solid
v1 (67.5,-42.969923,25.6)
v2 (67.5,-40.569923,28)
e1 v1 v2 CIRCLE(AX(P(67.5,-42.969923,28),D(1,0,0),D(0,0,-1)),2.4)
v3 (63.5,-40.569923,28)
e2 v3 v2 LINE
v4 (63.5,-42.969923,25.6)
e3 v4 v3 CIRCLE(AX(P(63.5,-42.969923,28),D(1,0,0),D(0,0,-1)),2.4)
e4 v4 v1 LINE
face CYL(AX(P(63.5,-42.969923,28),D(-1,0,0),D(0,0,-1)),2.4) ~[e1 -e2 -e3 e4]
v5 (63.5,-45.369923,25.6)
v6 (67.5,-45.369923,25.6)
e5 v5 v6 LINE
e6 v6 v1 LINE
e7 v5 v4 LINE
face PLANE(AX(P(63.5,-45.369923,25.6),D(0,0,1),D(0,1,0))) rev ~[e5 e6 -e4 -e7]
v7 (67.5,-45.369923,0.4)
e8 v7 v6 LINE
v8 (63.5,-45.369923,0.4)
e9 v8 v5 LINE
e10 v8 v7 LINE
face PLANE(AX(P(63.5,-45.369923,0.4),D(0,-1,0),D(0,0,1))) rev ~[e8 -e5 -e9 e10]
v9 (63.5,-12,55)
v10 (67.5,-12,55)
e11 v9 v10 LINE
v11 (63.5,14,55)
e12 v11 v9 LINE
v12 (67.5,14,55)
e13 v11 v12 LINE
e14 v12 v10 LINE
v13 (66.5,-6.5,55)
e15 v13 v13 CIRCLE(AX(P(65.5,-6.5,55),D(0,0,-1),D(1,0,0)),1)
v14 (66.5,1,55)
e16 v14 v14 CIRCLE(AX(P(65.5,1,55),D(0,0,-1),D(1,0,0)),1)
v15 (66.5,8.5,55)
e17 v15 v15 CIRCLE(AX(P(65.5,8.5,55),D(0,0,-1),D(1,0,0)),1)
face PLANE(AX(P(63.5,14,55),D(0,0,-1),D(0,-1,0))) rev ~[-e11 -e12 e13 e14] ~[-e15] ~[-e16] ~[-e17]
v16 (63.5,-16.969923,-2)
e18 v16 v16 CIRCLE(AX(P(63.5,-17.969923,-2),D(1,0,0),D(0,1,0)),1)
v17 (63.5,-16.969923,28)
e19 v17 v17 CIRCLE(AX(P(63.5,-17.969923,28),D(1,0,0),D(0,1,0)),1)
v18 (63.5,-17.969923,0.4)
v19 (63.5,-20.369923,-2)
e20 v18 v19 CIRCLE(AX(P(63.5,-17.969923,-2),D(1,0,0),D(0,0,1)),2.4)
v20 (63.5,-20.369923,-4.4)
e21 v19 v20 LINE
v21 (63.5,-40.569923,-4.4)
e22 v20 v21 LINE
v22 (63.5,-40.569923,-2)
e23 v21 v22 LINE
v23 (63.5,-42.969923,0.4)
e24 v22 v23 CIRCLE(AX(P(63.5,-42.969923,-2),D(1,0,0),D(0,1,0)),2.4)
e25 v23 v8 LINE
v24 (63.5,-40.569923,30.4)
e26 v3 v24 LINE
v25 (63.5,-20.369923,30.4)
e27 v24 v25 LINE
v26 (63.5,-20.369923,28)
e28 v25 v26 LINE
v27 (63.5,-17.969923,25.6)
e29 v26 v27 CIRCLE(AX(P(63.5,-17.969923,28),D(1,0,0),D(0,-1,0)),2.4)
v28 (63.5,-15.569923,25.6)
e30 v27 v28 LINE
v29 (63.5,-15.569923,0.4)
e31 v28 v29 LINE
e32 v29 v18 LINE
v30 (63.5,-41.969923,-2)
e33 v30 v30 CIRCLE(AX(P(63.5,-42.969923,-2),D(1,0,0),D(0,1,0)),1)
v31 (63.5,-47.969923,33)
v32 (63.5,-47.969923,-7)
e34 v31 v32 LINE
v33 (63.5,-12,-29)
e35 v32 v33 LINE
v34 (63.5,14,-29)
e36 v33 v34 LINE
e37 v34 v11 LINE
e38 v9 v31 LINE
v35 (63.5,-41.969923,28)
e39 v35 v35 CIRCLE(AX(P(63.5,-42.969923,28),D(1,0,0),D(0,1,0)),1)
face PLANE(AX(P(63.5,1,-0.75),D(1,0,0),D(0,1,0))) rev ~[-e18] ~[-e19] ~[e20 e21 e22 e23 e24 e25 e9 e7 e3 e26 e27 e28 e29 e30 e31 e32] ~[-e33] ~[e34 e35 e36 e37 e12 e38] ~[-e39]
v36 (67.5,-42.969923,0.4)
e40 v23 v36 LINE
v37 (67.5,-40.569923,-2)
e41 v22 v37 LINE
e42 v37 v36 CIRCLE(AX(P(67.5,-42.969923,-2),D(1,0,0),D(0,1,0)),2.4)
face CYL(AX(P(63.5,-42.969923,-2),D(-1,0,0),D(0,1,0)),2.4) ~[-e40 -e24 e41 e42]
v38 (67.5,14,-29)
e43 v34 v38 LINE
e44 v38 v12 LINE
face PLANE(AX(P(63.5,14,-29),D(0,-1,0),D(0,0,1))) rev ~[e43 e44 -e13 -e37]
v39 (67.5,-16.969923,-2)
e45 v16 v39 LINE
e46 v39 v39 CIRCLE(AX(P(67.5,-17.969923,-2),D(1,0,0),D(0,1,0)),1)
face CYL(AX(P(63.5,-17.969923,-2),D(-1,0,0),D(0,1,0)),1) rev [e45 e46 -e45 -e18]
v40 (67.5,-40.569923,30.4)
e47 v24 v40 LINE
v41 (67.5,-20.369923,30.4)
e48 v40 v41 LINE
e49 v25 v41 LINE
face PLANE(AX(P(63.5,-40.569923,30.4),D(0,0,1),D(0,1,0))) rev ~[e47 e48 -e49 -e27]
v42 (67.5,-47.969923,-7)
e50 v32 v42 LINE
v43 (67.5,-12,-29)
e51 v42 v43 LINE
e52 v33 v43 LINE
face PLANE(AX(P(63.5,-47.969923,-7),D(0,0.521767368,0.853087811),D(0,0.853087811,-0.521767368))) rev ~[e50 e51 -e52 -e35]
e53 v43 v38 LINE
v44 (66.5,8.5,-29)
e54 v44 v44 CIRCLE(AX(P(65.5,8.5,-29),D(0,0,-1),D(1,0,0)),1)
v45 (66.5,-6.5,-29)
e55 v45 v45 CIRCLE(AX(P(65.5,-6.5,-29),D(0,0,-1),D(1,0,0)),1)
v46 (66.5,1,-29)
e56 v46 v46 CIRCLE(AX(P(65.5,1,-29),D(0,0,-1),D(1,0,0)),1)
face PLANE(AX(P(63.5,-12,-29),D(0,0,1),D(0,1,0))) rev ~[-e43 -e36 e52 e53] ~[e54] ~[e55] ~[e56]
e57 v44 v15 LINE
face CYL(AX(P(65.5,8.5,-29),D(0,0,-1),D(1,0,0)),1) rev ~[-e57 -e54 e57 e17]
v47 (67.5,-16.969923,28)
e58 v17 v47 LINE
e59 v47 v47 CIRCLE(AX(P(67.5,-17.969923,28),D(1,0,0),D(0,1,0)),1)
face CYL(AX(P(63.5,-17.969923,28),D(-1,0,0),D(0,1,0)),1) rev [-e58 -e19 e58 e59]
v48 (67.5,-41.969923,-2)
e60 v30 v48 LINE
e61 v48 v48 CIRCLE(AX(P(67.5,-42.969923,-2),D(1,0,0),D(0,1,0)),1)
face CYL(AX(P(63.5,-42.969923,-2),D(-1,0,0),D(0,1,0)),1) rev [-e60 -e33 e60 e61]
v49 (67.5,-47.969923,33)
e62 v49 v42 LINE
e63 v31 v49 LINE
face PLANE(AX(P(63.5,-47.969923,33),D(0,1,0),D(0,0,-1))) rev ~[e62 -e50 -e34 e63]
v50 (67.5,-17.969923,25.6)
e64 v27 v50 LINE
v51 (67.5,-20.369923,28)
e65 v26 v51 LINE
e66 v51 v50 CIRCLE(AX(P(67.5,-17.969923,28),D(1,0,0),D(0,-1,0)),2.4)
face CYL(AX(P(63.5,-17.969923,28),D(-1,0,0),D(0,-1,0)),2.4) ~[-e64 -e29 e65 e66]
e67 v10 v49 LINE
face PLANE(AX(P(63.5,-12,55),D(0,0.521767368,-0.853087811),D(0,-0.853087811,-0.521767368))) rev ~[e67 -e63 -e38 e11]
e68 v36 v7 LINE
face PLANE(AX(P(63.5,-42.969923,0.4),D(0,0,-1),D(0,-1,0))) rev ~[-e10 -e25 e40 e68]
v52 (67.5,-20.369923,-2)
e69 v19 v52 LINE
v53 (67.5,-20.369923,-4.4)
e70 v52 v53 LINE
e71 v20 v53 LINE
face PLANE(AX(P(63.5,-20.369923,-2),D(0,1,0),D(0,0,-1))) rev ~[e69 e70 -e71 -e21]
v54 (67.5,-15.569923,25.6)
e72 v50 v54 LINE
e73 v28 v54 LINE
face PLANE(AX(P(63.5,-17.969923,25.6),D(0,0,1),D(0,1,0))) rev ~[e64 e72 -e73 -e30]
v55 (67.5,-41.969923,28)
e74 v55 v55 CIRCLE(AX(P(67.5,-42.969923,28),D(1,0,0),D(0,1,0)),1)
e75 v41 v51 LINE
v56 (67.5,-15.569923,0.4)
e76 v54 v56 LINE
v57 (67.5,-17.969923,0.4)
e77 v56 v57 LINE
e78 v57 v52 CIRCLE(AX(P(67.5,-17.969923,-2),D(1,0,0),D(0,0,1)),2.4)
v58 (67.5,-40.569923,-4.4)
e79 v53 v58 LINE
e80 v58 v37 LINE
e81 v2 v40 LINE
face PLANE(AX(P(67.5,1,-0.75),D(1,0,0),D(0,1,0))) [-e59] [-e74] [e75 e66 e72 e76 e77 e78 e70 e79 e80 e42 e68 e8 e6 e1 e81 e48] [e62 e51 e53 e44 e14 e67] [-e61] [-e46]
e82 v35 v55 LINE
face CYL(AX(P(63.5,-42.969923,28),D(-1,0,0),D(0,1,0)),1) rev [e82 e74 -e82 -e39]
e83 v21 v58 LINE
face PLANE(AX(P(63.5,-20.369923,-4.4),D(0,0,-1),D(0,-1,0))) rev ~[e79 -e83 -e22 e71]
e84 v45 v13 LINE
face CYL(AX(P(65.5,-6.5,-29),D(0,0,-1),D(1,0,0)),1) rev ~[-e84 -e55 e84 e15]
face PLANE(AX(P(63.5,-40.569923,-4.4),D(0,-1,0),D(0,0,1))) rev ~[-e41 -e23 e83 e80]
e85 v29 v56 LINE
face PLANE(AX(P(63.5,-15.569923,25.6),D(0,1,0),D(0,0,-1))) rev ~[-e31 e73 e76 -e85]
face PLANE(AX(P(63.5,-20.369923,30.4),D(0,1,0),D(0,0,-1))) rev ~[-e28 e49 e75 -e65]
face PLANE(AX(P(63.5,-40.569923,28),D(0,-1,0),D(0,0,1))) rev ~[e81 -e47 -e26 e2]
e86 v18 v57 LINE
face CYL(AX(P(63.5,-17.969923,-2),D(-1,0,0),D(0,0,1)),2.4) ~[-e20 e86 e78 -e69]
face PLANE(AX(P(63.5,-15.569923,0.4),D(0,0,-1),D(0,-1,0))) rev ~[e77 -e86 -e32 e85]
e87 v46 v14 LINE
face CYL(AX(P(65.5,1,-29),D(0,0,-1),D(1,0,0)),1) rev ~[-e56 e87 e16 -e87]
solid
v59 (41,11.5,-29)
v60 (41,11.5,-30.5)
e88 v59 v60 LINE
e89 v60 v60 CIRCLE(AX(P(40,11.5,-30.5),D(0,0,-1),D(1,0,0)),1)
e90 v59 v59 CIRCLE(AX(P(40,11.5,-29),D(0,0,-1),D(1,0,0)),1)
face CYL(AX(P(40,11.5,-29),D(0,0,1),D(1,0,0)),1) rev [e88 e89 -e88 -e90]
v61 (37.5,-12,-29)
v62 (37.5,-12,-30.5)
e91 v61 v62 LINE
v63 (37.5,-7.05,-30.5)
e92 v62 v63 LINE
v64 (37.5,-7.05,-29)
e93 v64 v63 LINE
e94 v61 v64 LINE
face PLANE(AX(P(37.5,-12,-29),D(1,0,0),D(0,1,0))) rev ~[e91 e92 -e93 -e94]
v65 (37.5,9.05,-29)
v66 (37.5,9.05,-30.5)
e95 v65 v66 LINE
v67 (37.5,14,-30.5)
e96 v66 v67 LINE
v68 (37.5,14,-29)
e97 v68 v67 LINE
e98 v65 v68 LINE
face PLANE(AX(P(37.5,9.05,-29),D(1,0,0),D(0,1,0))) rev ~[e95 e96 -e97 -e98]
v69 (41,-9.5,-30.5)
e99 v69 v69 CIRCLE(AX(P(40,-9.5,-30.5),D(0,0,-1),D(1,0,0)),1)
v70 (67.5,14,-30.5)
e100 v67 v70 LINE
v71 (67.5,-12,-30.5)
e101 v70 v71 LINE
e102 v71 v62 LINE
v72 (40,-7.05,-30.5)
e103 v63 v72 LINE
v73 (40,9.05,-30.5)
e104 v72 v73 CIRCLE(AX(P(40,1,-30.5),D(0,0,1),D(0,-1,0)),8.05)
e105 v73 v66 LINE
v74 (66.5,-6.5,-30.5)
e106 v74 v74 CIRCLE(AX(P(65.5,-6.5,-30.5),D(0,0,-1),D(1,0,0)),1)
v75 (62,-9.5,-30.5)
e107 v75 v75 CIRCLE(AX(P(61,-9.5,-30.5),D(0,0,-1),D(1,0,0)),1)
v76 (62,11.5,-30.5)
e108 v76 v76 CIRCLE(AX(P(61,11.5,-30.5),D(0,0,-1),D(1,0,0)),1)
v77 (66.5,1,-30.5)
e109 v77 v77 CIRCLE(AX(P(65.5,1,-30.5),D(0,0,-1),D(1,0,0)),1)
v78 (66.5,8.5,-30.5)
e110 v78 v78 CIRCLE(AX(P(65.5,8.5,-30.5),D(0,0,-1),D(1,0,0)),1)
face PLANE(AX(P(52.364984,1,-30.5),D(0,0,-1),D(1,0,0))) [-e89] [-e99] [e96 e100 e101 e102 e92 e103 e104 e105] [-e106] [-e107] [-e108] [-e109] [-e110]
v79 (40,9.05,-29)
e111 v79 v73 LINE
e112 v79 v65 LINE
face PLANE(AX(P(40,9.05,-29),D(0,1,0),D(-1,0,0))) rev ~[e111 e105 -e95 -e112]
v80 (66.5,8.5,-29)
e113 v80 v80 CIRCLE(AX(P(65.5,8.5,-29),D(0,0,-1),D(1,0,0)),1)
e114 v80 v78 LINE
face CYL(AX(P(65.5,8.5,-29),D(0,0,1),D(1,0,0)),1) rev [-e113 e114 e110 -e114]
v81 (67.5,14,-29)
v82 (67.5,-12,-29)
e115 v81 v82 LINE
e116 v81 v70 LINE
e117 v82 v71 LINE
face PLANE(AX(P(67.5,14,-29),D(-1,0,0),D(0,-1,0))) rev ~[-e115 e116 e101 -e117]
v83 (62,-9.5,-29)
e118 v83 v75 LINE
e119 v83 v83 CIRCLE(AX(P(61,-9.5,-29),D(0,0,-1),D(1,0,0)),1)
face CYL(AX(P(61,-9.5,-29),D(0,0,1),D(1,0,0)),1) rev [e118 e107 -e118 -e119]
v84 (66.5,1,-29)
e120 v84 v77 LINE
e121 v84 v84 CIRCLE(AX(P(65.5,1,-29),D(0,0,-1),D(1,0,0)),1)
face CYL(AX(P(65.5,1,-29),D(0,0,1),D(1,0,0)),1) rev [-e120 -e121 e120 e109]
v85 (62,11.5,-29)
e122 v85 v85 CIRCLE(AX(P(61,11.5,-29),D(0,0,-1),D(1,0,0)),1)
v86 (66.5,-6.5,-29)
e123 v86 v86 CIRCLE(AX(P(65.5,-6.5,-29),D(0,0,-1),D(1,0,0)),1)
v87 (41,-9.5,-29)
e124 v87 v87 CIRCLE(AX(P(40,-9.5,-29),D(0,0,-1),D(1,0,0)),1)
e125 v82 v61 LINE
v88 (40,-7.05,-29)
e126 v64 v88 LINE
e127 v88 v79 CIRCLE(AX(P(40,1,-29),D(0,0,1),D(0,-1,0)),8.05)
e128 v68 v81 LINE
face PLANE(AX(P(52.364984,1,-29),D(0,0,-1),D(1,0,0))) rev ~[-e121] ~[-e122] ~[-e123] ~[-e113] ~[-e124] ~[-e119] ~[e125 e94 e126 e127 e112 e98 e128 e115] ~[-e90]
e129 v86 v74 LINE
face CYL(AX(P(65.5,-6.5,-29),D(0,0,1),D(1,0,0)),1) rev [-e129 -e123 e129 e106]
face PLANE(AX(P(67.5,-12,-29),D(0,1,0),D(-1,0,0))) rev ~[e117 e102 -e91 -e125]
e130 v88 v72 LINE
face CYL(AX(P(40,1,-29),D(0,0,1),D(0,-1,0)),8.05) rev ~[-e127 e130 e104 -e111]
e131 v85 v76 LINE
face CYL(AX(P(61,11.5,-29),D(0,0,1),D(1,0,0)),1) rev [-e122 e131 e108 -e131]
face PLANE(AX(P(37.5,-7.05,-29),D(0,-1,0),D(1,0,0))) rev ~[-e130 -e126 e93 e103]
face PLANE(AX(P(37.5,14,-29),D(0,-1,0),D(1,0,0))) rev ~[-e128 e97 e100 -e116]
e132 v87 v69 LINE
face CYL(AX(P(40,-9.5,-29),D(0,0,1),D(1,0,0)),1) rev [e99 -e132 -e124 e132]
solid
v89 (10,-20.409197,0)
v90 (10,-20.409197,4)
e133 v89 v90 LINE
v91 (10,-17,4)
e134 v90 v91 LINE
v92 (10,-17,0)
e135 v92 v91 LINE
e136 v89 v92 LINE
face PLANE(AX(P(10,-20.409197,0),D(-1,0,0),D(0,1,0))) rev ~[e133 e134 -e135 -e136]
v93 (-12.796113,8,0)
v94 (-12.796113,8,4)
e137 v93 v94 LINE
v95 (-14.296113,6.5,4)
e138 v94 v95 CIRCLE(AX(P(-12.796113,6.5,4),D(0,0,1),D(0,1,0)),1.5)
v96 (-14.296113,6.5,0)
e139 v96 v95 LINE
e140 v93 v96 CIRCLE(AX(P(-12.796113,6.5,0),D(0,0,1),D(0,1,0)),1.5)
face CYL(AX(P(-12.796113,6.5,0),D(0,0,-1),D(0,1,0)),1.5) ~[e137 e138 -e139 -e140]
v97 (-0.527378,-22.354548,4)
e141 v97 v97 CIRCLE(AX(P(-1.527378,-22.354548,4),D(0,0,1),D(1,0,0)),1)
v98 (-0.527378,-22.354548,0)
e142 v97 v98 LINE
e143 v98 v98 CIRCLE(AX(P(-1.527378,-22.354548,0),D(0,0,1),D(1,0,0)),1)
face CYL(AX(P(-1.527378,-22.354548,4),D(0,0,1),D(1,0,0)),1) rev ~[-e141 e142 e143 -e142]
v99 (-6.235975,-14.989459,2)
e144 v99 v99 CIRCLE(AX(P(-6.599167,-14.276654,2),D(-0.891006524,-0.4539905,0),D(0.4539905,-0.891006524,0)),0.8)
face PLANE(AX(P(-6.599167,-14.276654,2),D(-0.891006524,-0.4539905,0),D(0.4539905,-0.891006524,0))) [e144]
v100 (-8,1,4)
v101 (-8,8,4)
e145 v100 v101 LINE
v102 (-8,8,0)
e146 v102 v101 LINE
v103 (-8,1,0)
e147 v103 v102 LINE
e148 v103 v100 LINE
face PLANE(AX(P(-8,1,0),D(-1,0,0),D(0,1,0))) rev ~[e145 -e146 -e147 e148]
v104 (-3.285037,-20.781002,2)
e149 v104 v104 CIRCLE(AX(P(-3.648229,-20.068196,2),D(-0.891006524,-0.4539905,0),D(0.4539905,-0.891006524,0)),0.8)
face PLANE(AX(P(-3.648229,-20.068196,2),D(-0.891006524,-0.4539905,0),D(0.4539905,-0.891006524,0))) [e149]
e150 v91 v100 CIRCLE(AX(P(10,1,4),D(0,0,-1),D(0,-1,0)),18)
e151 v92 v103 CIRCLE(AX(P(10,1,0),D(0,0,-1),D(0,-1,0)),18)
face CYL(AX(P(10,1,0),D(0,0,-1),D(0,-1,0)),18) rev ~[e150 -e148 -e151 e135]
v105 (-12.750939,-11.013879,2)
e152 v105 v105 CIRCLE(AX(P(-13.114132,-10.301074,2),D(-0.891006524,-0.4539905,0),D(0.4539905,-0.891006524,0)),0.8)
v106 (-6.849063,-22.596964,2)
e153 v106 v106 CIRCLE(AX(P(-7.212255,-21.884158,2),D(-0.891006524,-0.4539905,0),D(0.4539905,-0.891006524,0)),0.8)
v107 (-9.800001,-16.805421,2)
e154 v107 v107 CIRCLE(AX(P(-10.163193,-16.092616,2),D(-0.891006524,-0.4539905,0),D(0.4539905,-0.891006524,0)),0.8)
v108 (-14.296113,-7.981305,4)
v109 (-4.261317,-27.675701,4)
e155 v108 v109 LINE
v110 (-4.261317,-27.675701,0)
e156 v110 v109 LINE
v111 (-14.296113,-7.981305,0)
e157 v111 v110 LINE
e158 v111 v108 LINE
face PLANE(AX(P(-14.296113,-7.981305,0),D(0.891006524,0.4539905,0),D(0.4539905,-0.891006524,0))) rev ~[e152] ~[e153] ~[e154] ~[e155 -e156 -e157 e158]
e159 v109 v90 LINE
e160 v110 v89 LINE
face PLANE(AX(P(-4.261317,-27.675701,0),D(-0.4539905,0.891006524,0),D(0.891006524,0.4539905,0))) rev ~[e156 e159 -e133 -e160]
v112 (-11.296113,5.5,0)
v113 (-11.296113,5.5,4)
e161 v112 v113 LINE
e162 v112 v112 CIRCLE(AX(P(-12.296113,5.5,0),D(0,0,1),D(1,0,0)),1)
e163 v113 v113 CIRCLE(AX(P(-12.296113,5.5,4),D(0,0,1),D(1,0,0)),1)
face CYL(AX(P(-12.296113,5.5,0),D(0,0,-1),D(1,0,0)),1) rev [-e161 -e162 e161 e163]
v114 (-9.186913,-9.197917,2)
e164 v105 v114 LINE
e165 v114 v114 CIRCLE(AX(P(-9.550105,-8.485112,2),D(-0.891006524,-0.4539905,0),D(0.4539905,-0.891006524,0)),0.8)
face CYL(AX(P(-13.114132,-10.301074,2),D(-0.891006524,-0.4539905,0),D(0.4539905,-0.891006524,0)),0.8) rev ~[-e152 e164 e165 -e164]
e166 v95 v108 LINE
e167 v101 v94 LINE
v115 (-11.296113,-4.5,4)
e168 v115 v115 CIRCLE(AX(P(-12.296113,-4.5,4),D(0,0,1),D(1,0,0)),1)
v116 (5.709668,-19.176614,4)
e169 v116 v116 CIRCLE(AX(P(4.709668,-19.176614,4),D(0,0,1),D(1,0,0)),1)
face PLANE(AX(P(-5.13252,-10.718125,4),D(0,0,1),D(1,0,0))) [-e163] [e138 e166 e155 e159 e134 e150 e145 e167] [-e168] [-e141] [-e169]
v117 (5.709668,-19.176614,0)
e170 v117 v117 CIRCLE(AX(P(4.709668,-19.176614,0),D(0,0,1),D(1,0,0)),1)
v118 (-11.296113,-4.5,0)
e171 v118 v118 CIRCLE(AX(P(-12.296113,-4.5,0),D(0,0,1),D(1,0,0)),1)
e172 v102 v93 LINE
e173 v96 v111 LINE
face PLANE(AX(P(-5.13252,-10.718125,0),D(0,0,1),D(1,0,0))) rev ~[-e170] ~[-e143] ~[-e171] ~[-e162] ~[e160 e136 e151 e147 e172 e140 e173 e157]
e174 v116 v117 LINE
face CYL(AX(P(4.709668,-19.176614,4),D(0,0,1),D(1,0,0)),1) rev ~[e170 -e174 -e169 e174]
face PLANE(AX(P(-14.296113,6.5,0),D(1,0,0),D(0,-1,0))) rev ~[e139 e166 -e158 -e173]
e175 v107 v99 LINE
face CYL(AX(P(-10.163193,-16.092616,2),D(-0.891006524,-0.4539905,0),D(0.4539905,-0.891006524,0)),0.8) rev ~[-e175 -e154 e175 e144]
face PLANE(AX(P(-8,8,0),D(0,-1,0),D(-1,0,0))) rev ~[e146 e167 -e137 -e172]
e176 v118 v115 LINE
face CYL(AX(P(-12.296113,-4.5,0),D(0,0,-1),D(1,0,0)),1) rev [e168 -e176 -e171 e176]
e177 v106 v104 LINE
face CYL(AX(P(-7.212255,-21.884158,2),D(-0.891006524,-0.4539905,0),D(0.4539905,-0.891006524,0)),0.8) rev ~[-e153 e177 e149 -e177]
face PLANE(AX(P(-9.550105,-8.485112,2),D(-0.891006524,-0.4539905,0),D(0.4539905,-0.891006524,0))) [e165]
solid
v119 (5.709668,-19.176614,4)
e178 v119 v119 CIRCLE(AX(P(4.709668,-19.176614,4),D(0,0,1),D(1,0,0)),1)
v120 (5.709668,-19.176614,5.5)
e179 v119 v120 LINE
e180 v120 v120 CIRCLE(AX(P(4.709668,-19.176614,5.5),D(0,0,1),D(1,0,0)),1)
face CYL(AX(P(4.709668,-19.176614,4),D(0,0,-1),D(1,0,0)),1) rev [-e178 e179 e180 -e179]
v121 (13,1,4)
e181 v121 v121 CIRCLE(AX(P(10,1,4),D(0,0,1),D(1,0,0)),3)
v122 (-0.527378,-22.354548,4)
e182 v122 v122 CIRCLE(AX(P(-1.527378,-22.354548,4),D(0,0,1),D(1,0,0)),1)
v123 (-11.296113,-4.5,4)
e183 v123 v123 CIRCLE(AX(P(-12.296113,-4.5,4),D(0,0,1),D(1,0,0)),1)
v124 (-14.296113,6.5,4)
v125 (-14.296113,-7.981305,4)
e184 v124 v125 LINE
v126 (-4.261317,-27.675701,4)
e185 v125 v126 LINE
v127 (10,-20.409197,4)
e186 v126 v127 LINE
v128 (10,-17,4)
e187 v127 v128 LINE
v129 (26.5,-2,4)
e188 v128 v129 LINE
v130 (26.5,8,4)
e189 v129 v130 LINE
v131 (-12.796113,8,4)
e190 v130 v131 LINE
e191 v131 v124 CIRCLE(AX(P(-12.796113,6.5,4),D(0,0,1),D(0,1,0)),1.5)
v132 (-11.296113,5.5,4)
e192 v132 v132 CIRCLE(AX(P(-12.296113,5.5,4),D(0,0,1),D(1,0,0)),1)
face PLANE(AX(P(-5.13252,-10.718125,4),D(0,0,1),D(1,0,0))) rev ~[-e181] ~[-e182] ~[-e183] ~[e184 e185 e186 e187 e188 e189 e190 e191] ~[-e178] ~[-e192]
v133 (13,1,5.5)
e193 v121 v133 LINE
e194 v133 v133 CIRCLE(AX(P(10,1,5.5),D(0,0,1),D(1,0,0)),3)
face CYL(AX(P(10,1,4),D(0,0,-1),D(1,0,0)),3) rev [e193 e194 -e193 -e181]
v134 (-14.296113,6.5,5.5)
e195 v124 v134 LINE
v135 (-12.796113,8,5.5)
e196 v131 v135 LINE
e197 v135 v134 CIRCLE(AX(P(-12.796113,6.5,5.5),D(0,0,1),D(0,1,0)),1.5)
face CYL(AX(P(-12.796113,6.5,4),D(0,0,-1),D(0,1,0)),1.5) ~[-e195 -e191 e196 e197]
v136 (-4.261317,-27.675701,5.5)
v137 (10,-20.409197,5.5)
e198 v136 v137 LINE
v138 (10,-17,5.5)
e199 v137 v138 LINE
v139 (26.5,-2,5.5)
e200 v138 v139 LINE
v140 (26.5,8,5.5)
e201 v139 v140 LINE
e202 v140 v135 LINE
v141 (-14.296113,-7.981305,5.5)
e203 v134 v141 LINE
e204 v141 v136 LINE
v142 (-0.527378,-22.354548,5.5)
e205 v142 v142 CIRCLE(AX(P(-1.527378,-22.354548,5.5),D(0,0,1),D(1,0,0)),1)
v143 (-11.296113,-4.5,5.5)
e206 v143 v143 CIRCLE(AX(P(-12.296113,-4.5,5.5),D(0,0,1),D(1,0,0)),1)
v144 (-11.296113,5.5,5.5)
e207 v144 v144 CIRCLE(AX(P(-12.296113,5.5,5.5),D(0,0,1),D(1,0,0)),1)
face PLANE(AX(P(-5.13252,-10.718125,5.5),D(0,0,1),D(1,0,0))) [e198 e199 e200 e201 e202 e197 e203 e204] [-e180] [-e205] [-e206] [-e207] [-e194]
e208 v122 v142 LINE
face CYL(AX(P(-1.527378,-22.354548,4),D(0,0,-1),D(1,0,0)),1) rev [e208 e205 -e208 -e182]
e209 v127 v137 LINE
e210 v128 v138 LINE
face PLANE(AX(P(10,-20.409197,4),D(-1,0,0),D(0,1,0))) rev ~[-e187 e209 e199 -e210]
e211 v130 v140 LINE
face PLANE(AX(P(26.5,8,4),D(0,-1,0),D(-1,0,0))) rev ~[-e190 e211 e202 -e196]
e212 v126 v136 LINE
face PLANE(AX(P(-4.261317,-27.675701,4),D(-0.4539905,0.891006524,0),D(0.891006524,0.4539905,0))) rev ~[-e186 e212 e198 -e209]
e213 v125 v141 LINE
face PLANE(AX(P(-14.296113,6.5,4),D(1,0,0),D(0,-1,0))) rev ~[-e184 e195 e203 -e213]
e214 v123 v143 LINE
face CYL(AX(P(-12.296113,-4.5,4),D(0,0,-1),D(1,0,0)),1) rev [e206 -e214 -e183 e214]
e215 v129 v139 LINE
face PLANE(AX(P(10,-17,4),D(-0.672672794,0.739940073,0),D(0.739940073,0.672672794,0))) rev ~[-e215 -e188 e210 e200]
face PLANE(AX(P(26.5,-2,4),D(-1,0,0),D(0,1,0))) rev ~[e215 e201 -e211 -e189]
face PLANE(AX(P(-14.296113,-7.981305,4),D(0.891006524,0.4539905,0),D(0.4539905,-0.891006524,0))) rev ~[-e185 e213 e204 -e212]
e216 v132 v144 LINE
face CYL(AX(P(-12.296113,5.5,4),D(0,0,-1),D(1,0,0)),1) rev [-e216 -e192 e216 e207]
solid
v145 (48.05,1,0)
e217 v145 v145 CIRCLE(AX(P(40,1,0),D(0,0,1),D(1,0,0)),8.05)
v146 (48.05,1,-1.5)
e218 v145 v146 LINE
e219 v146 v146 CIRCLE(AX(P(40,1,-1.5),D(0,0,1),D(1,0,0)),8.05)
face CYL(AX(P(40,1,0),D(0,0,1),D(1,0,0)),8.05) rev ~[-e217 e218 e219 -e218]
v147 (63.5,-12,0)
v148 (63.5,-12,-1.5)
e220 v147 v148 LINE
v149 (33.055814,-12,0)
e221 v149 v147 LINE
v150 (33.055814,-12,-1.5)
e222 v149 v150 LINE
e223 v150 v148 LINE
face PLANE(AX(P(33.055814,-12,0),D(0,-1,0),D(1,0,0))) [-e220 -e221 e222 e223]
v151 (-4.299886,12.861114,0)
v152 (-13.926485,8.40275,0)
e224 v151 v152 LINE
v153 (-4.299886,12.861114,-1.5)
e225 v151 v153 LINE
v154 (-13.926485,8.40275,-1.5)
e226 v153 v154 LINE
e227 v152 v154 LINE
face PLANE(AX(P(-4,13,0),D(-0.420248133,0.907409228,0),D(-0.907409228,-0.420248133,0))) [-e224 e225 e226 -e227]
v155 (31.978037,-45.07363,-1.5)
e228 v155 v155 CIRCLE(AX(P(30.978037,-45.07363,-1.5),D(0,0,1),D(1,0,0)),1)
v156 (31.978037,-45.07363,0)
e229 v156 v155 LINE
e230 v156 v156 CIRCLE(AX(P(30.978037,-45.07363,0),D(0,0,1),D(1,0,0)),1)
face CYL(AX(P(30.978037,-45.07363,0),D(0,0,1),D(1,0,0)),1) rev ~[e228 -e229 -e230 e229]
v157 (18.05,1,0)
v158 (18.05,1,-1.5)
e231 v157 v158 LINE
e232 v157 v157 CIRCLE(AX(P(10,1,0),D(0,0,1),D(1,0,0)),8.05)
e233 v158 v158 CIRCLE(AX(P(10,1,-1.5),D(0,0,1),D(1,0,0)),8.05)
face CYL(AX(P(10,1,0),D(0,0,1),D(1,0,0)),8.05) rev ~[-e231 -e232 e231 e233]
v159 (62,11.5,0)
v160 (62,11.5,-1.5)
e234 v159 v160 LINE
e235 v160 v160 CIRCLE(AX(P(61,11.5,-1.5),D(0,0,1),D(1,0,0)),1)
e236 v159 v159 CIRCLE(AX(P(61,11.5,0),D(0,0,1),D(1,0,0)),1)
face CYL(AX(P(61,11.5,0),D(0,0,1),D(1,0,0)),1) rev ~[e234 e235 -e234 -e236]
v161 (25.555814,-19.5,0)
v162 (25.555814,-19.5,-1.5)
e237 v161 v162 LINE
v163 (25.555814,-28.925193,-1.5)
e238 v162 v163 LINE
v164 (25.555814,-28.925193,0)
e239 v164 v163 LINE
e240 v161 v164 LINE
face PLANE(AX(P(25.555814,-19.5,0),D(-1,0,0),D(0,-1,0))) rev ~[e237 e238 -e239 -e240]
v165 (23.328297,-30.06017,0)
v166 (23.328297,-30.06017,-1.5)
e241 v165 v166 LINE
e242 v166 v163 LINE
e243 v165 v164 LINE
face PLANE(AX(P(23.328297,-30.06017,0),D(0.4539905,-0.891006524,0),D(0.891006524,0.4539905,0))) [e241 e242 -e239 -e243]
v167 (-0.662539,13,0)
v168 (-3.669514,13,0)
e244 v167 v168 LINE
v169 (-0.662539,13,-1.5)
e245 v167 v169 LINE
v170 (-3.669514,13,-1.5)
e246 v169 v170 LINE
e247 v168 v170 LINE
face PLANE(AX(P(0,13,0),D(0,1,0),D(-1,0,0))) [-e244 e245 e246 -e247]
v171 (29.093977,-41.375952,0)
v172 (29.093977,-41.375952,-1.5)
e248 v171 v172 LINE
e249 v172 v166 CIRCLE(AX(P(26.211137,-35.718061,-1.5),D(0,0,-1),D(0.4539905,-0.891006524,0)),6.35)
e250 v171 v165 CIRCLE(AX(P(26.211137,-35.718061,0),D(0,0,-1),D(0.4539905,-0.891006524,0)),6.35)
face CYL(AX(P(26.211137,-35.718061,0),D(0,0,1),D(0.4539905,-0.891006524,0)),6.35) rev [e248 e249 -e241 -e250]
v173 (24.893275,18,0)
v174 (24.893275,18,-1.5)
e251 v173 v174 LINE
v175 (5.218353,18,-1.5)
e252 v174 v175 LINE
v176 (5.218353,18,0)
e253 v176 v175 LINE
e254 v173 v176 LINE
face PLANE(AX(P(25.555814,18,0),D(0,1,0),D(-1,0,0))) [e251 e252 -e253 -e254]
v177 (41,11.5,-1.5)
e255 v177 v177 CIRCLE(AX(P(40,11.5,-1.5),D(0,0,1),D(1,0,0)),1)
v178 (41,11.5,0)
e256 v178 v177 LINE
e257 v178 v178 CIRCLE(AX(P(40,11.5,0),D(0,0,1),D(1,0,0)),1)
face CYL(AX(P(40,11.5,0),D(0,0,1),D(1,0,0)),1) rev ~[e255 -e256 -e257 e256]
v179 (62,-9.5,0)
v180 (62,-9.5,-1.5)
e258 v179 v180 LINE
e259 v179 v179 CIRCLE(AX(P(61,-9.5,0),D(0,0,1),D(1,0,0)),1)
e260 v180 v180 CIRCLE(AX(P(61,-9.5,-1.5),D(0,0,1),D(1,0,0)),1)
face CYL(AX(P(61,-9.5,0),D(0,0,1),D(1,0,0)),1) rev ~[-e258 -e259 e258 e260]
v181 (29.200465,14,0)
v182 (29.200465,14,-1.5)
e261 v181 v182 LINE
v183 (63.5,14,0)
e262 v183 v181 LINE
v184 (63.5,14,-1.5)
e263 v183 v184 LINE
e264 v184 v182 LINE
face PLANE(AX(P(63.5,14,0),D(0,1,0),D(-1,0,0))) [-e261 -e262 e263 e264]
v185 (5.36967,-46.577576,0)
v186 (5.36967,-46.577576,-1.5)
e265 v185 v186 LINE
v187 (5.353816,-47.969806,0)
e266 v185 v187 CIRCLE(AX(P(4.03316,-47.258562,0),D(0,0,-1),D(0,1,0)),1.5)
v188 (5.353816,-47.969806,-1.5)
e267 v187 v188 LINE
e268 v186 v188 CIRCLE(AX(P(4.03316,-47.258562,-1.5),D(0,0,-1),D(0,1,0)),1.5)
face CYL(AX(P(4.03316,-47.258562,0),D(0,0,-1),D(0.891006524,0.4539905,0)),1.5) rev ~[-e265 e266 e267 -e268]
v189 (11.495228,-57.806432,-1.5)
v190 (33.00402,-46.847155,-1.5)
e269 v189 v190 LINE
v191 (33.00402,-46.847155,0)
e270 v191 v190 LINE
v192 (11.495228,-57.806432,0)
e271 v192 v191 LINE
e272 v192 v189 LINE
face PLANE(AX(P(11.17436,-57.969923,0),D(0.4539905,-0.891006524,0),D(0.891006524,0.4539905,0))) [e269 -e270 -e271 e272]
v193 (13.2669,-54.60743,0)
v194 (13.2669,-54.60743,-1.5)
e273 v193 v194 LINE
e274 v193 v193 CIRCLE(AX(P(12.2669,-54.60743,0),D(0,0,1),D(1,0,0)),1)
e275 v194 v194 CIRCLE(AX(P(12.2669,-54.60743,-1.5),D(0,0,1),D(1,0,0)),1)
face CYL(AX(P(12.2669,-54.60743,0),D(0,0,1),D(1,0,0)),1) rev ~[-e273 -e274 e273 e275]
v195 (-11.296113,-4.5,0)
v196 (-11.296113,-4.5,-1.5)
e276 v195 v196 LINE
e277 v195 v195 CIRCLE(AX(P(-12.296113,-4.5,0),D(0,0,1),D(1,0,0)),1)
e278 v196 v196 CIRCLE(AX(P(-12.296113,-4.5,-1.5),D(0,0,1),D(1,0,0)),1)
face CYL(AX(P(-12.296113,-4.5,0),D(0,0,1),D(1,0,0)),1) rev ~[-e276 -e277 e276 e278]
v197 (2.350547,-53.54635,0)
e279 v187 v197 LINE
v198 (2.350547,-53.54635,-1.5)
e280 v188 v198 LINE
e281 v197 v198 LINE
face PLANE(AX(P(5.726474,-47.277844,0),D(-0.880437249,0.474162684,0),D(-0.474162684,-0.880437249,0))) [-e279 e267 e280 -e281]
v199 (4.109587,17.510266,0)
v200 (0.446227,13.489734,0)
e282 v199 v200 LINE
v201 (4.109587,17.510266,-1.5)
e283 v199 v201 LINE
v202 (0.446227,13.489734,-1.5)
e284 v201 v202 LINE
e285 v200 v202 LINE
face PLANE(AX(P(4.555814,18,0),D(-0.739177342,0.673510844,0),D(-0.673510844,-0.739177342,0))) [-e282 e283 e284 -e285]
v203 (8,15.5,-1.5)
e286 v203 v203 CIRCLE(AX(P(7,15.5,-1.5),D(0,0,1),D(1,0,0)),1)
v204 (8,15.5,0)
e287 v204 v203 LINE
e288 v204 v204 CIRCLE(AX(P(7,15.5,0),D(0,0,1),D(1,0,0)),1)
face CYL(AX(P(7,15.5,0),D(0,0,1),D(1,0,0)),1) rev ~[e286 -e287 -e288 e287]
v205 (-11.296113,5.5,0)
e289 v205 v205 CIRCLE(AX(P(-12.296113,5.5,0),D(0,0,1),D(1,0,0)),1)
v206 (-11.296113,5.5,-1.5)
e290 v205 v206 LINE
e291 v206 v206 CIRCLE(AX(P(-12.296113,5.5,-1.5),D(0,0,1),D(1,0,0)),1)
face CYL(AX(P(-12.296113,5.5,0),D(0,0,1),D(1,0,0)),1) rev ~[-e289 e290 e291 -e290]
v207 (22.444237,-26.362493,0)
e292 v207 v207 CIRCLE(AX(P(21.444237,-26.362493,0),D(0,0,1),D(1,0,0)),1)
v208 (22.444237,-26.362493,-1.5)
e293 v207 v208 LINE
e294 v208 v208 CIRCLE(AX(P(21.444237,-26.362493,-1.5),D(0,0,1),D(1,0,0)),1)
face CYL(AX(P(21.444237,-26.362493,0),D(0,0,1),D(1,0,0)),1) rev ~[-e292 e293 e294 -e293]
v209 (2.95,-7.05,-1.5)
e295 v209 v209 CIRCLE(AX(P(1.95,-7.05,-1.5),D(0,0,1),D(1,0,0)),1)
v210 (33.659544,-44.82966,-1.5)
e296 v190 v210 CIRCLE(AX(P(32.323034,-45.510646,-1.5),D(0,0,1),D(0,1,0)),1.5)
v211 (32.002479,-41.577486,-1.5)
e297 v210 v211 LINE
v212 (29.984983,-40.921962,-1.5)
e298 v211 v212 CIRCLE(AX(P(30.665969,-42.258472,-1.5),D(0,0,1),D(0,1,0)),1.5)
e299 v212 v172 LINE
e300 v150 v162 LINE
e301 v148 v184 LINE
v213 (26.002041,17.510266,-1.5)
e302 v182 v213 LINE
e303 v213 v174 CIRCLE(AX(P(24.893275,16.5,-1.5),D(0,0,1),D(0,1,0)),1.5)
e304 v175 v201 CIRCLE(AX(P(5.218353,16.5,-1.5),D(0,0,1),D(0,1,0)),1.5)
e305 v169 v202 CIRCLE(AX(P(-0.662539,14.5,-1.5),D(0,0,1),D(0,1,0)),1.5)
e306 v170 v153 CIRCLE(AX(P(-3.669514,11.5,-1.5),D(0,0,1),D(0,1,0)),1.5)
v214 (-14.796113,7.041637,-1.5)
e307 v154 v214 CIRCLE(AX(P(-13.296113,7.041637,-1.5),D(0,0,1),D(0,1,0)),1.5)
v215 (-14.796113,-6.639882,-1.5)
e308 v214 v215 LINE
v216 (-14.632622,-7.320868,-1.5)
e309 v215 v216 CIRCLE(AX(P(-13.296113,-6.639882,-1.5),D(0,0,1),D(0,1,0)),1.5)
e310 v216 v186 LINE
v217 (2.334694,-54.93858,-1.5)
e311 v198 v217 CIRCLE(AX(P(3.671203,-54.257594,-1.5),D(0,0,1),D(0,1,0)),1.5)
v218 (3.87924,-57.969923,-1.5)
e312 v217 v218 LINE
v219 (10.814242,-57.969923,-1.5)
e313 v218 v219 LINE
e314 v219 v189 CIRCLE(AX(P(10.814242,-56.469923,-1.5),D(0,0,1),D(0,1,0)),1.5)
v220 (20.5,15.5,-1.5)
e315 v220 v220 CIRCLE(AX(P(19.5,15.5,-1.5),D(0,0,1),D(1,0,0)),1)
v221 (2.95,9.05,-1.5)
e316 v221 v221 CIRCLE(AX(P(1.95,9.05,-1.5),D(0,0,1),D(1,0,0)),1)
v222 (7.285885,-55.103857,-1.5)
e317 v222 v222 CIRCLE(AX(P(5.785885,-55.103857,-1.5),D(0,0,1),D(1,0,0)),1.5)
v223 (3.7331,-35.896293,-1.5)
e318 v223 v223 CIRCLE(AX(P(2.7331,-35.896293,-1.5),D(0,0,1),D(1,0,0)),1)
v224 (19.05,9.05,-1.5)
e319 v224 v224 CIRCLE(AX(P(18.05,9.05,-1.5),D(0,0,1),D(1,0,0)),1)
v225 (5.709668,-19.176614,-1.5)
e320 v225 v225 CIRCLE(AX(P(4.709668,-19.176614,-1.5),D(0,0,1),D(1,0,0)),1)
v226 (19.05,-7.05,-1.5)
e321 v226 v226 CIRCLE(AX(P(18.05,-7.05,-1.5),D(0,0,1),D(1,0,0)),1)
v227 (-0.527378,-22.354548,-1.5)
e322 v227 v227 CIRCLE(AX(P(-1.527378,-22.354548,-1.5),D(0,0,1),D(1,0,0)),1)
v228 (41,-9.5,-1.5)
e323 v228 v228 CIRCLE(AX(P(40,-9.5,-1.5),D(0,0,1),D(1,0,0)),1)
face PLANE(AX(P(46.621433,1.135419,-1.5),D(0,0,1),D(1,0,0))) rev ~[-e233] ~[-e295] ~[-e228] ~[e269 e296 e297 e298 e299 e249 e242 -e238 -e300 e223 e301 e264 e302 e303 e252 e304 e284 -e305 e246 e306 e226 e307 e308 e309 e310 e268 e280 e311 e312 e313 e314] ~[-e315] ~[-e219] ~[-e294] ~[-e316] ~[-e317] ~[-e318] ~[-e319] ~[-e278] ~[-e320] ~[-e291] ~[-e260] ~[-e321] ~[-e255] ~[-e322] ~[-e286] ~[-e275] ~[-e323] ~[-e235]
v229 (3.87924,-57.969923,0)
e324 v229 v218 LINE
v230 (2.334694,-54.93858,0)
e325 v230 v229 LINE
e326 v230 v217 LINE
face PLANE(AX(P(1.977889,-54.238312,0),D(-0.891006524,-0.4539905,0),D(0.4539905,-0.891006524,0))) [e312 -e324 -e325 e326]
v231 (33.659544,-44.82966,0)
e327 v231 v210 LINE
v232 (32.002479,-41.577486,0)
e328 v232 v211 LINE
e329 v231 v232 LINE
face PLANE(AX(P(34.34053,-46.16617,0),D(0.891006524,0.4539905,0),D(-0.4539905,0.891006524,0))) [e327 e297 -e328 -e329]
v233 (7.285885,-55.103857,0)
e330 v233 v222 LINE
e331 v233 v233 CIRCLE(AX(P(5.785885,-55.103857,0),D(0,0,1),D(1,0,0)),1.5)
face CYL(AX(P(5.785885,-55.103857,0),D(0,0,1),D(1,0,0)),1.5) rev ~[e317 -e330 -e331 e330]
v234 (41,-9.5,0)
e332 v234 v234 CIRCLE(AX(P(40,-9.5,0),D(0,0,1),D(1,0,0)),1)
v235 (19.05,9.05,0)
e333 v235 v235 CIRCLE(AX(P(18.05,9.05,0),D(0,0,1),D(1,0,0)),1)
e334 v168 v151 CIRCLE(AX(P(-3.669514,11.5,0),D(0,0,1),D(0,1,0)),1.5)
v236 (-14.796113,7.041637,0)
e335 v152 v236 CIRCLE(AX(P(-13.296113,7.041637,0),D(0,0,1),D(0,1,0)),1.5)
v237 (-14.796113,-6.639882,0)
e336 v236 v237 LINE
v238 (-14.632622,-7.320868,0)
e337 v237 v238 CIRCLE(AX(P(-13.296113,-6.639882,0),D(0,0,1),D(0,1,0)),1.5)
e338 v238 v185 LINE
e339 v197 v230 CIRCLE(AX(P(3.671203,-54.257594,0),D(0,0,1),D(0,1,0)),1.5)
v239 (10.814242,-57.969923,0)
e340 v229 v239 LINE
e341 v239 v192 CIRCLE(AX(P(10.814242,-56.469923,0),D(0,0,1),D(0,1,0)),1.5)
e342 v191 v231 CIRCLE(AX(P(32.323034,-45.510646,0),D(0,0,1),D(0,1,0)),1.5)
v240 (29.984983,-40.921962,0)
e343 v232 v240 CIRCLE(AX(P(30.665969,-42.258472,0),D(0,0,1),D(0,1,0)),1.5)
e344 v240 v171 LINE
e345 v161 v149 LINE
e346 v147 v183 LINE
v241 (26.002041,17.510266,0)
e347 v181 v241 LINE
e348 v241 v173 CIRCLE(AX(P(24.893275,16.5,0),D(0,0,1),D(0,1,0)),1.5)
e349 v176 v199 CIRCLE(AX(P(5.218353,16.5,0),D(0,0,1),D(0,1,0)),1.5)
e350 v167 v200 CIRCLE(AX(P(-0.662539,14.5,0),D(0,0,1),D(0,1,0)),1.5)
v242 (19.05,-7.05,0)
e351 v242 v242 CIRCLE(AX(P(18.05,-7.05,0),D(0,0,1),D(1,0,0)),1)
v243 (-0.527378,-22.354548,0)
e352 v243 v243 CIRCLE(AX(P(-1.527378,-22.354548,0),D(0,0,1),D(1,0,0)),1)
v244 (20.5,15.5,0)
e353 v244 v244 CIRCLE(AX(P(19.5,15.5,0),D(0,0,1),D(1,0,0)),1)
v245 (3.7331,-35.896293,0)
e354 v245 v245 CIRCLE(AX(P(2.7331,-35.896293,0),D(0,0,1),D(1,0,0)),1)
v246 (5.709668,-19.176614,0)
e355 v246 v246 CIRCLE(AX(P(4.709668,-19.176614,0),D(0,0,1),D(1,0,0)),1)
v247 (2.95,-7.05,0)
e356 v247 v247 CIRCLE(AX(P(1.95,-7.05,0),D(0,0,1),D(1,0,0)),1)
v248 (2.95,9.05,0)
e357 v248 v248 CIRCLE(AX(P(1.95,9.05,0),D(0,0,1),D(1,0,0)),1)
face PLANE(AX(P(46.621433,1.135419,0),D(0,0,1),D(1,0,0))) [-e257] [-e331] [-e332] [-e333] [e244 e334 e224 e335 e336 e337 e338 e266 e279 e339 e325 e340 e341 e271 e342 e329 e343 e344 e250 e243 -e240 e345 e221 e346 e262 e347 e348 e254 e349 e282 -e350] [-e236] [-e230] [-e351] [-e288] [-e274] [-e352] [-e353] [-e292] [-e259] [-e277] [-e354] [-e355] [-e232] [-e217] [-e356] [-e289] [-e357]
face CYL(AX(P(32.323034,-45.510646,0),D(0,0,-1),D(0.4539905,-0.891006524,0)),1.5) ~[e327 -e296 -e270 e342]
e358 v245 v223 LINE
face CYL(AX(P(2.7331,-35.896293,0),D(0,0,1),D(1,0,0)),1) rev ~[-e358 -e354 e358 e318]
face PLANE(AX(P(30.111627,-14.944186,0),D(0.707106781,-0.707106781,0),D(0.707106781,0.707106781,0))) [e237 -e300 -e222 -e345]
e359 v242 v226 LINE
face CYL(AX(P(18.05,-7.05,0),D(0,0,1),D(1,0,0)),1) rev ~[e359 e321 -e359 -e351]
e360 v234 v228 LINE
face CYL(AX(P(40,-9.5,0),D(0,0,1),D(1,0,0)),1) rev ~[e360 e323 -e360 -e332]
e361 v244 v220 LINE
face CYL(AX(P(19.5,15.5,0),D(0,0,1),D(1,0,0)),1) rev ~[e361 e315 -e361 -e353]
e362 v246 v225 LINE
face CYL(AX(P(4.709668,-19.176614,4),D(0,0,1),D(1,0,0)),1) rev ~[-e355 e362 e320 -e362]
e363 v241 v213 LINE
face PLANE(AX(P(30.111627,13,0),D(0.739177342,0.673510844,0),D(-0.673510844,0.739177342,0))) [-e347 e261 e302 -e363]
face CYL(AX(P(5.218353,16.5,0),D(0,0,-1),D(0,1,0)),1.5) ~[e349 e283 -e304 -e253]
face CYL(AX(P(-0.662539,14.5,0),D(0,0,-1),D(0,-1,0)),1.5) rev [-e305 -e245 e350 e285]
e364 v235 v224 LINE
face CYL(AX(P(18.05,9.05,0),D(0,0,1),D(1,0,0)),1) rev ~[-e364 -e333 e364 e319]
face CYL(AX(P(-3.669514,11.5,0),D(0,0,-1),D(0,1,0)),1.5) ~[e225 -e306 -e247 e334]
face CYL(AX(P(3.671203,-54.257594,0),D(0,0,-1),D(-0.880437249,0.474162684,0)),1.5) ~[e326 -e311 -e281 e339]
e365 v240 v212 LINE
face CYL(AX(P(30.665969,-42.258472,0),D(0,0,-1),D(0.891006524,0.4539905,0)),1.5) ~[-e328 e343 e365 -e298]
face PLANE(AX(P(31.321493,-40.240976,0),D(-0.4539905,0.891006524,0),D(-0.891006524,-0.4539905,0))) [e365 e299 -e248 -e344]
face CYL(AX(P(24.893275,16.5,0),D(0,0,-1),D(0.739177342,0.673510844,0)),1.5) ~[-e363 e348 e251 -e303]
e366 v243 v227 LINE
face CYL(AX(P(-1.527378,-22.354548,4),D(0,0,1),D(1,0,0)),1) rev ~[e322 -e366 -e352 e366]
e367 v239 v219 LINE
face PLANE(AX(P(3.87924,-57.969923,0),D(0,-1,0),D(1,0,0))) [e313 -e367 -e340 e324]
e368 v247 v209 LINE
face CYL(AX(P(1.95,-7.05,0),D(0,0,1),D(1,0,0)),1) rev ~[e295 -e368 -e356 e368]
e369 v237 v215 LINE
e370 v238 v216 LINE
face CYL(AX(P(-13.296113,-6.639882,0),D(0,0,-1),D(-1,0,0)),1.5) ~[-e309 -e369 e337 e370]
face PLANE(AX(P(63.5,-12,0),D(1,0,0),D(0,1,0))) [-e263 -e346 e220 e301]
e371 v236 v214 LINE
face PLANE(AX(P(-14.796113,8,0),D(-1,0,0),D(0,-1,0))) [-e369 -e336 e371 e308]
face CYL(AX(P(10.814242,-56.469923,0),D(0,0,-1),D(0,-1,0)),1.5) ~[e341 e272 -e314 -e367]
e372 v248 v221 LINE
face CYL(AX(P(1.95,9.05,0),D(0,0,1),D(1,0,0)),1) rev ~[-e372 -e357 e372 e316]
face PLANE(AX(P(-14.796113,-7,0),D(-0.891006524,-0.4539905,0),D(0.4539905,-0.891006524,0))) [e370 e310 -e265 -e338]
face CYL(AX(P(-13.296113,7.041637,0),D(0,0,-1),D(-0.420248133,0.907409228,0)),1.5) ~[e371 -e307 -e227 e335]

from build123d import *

# Parameters (mm, degrees)
F0_R      = 1
F0_R_2    = 1.5
F1_DEPTH  = 1.5
F2_R      = 1.5
F3_R      = 1
F3_R_2    = 8.05
F4_DEPTH  = 1.5
F5_DEPTH  = 1.5
F6_R      = 1
F7_DEPTH  = 4
F8_R      = 1
F8_R_2    = 3
F9_DEPTH  = 1.5
F10_R     = 0.8
F11_DEPTH = 4
F12_DEPTH = 5.501
F13_W     = 26
F13_H     = 1.5
F13_R     = 1
F14_DEPTH = 4
F15_R     = 1
F16_DEPTH = 1.5
F17_DEPTH = 84.001


# Not quite as in the source:
# - a feature names something its author has since deleted; it is built from what else it names


with BuildPart() as f1:
    # F0 (on Top) → F1 (new body)
    with BuildSketch(Plane.XY):
        with BuildLine():
            Line((23.5, 13), (0, 13))
            Line((0, 13), (-4, 13))
            Line((-4, 13), (-14.7961125486, 8))
            Line((-14.7961125486, 8), (-14.7961125486, -7))
            Line((-14.7961125486, -7), (2.3896440162, -40.7289463791))
            Line((2.3896440162, -40.7289463791), (4.6171603267, -39.5939701297))
            ThreePointArc((4.6171603267, -39.5939701297), (13.1578914286, -42.369021885), (10.3828396733, -50.9097529869))
            Line((10.3828396733, -50.9097529869), (8.1553233629, -52.0447292363))
            Line((8.1553233629, -52.0447292363), (11.1743601861, -57.9699226221))
            Line((11.1743601861, -57.9699226221), (34.340529815, -46.1661696289))
            Line((34.340529815, -46.1661696289), (31.3214929918, -40.240976243))
            Line((31.3214929918, -40.240976243), (29.0939766813, -41.3759524924))
            ThreePointArc((29.0939766813, -41.3759524924), (20.5532455794, -38.6009007371), (23.3282973346, -30.0601696352))
            Line((23.3282973346, -30.0601696352), (25.5558136451, -28.9251933859))
            Line((25.5558136451, -28.9251933859), (23.5, -24.8904319287))
            Line((23.5, -24.8904319287), (23.5, -13))
            Line((23.5, -13), (23.5, 13))
        make_face()
        with Locations((2.7330997527, -35.8962930544)):
            Circle(F0_R, mode=Mode.SUBTRACT)
        with Locations((12.2669002473, -54.6074300623)):
            Circle(F0_R, mode=Mode.SUBTRACT)
        with Locations((30.9780372552, -45.0736295678)):
            Circle(F0_R, mode=Mode.SUBTRACT)
        with Locations((21.4442367607, -26.3624925598)):
            Circle(F0_R, mode=Mode.SUBTRACT)
        with Locations((-12.2961125486, -4.5)):
            Circle(F0_R, mode=Mode.SUBTRACT)
        with Locations((-12.2961125486, 5.5)):
            Circle(F0_R, mode=Mode.SUBTRACT)
        Polygon((8.1553233629, -52.0447292363), (5.7264741893, -47.2778443319), (1.9778890309, -54.238311939), (3.8792396415, -57.9699226221), (11.1743601861, -57.9699226221), align=None)
        with Locations((5.7858848528, -55.1038567503)):
            Circle(F0_R_2, mode=Mode.SUBTRACT)
        Polygon((4.5558136451, 18), (0, 13), (23.5, 13), (23.5, 18), align=None)
        with Locations((7, 15.5)):
            Circle(F0_R, mode=Mode.SUBTRACT)
        with Locations((19.5, 15.5)):
            Circle(F0_R, mode=Mode.SUBTRACT)
        Polygon((23.5, 18), (23.5, 13), (25.5558136451, 13), (30.1116272902, 13), (25.5558136451, 18), align=None)
        Polygon((25.5558136451, 13), (23.5, 13), (23.5, -13), (23.5, -24.8904319287), (25.5558136451, -28.9251933859), align=None)
        Polygon((30.1116272902, 13), (25.5558136451, 13), (25.5558136451, -28.9251933859), (30.1116272902, -23.9251933859), align=None)
        with BuildLine():
            Line((4.6171603267, -39.5939701297), (2.3896440162, -40.7289463791))
            Line((2.3896440162, -40.7289463791), (5.7264741893, -47.2778443319))
            Line((5.7264741893, -47.2778443319), (8.1553233629, -52.0447292363))
            Line((8.1553233629, -52.0447292363), (10.3828396733, -50.9097529869))
            ThreePointArc((10.3828396733, -50.9097529869), (13.1578914286, -42.369021885), (4.6171603267, -39.5939701297))
        make_face()
    extrude(amount=-F1_DEPTH)

    # F2
    f2_edges = [f1.edges().sort_by_distance(p)[0] for p in [
        (5.726474, -47.277844, -0.75),
        (1.977889, -54.238312, -0.75),
        (11.17436, -57.969923, -0.75),
        (34.34053, -46.16617, -0.75),
        (30.111627, -23.925193, -0.75),
        (31.321493, -40.240976, -0.75),
        (-4, 13, -0.75),
        (-14.796113, 8, -0.75),
        (0, 13, -0.75),
        (-14.796113, -7, -0.75),
        (25.555814, 18, -0.75),
        (4.555814, 18, -0.75),
    ]]
    fillet(f2_edges, radius=F2_R)

    # F3 (on face) → F4 (join, through all)
    with BuildSketch(Plane.XY):
        Polygon((63.5, 14), (29.2004645611, 14), (30.1116272902, 13), (30.1116272902, -12), (33.0558136451, -12), (63.5, -12), align=None)
        with Locations((40, -9.5)):
            Circle(F3_R, mode=Mode.SUBTRACT)
        with Locations((61, -9.5)):
            Circle(F3_R, mode=Mode.SUBTRACT)
        with Locations((40, 1)):
            Circle(F3_R_2, mode=Mode.SUBTRACT)
        with Locations((40, 11.5)):
            Circle(F3_R, mode=Mode.SUBTRACT)
        with Locations((61, 11.5)):
            Circle(F3_R, mode=Mode.SUBTRACT)
        Polygon((33.0558136451, -12), (30.1116272902, -12), (30.1116272902, -14.9441863549), align=None)
    extrude(amount=-F4_DEPTH)

    # F3 (on face) → F5 (cut, through all)
    with BuildSketch(Plane.XY):
        with Locations((10, 1)):
            Circle(F3_R_2)
        with Locations((1.95, 9.05)):
            Circle(F3_R)
        with Locations((18.05, 9.05)):
            Circle(F3_R)
        with Locations((18.05, -7.05)):
            Circle(F3_R)
        with Locations((1.95, -7.05)):
            Circle(F3_R)
        with BuildLine():
            Line((30.1116272902, -23.3443059503), (30.1116272902, -22))
            Line((30.1116272902, -22), (30.1116272902, -14.9441863549))
            Line((30.1116272902, -14.9441863549), (25.5558136451, -19.5))
            Line((25.5558136451, -19.5), (25.5558136451, -28.9251933859))
            Line((25.5558136451, -28.9251933859), (29.7203933031, -24.3545722165))
            ThreePointArc((29.7203933031, -24.3545722165), (30.0104033658, -23.8859935819), (30.1116272902, -23.3443059503))
        make_face()
    extrude(amount=-F5_DEPTH, mode=Mode.SUBTRACT)


with BuildPart() as f7:
    # F6 (on face) → F7 (new body)
    with BuildSketch(Plane.XY):
        with BuildLine():
            Line((-8, 1), (-8, 8))
            Line((-8, 8), (-12.7961125486, 8))
            ThreePointArc((-12.7961125486, 8), (-13.8567727204, 7.5606601718), (-14.2961125486, 6.5))
            Line((-14.2961125486, 6.5), (-14.2961125486, -7.9813052528))
            Line((-14.2961125486, -7.9813052528), (-4.261316805, -27.6757007997))
            Line((-4.261316805, -27.6757007997), (10, -20.4091969443))
            Line((10, -20.4091969443), (10, -17))
            ThreePointArc((10, -17), (-2.7279220614, -11.7279220614), (-8, 1))
        make_face()
        with Locations((-12.2961125486, -4.5)):
            Circle(F6_R, mode=Mode.SUBTRACT)
        with Locations((-12.2961125486, 5.5)):
            Circle(F6_R, mode=Mode.SUBTRACT)
    extrude(amount=F7_DEPTH)

    # F10 (on face) → F11 (cut)
    with BuildSketch(Plane(origin=(-14.5780841283, -7.4279048682, 0), x_dir=(0.4539904997, -0.8910065242, 0), z_dir=(-0.8910065242, -0.4539904997, 0))):
        with Locations((16.2246326282, 2)):
            Circle(F10_R)
        with Locations((9.7246326282, 2)):
            Circle(F10_R)
        with Locations((3.2246326282, 2)):
            Circle(F10_R)
    extrude(amount=-F11_DEPTH, mode=Mode.SUBTRACT)


with BuildPart() as f9:
    # F8 (on face) → F9 (new body)
    with BuildSketch(Plane.XY.offset(4)):
        with BuildLine():
            Line((-14.2961125486, -7.9813052528), (-4.261316805, -27.6757007997))
            Line((-4.261316805, -27.6757007997), (10, -20.4091969443))
            Line((10, -20.4091969443), (10, -17))
            ThreePointArc((10, -17), (-2.7279220614, -11.7279220614), (-8, 1))
            Line((-8, 1), (-8, 8))
            Line((-8, 8), (-12.7961125486, 8))
            ThreePointArc((-12.7961125486, 8), (-13.8567727204, 7.5606601718), (-14.2961125486, 6.5))
            Line((-14.2961125486, 6.5), (-14.2961125486, -7.9813052528))
        make_face()
        with Locations((-1.5273779076, -22.3545475224)):
            Circle(F8_R, mode=Mode.SUBTRACT)
        with Locations((4.7096677618, -19.1766140242)):
            Circle(F8_R, mode=Mode.SUBTRACT)
        with Locations((-12.2961125486, -4.5)):
            Circle(F8_R, mode=Mode.SUBTRACT)
        with Locations((-12.2961125486, 5.5)):
            Circle(F8_R, mode=Mode.SUBTRACT)
        with BuildLine():
            ThreePointArc((-8, 1), (-2.7279220614, -11.7279220614), (10, -17))
            Line((10, -17), (26.5, -2))
            Line((26.5, -2), (26.5, 8))
            Line((26.5, 8), (-8, 8))
            Line((-8, 8), (-8, 1))
        make_face()
        with Locations((10, 1)):
            Circle(F8_R_2, mode=Mode.SUBTRACT)
    extrude(amount=F9_DEPTH)


with BuildPart() as f12_tool:
    # F8 (on face) → F12 (new body, through all)
    with BuildSketch(Plane.XY.offset(4)):
        with Locations((4.7096677618, -19.1766140242)):
            Circle(F8_R)
        with Locations((-1.5273779076, -22.3545475224)):
            Circle(F8_R)
    extrude(amount=-F12_DEPTH)


with BuildPart() as f1_1:
    add(f1.part)

    # F12: cut by f12_tool
    add(f12_tool.part, mode=Mode.SUBTRACT)


with BuildPart() as f7_1:
    add(f7.part)

    # F12: cut by f12_tool
    add(f12_tool.part, mode=Mode.SUBTRACT)


with BuildPart() as f14:
    # F13 (on face) → F14 (new body)
    with BuildSketch(Plane.YZ.offset(63.5)):
        with Locations((1, -0.75)):
            Rectangle(F13_W, F13_H)
        Polygon((-12, -29), (14, -29), (14, -1.5), (-12, -1.5), (-12, 0), (14, 0), (14, 55), (-12, 55), (-47.9699226221, 33), (-47.9699226221, -7), align=None)
        with Locations((-42.9699226221, -2)):
            Circle(F13_R, mode=Mode.SUBTRACT)
        with Locations((-17.9699226221, -2)):
            Circle(F13_R, mode=Mode.SUBTRACT)
        with Locations((-42.9699226221, 28)):
            Circle(F13_R, mode=Mode.SUBTRACT)
        with BuildLine():
            Line((-45.3699226221, 25.6), (-42.9699226221, 25.6))
            ThreePointArc((-42.9699226221, 25.6), (-41.2728663473, 26.3029437252), (-40.5699226221, 28))
            Line((-40.5699226221, 28), (-40.5699226221, 30.4))
            Line((-40.5699226221, 30.4), (-30.4699226221, 30.4))
            Line((-30.4699226221, 30.4), (-20.3699226221, 30.4))
            Line((-20.3699226221, 30.4), (-20.3699226221, 28))
            ThreePointArc((-20.3699226221, 28), (-19.666978897, 26.3029437252), (-17.9699226221, 25.6))
            Line((-17.9699226221, 25.6), (-15.5699226221, 25.6))
            Line((-15.5699226221, 25.6), (-15.5699226221, 13))
            Line((-15.5699226221, 13), (-15.5699226221, 0.4))
            Line((-15.5699226221, 0.4), (-17.9699226221, 0.4))
            ThreePointArc((-17.9699226221, 0.4), (-19.666978897, -0.3029437252), (-20.3699226221, -2))
            Line((-20.3699226221, -2), (-20.3699226221, -4.4))
            Line((-20.3699226221, -4.4), (-30.4699226221, -4.4))
            Line((-30.4699226221, -4.4), (-40.5699226221, -4.4))
            Line((-40.5699226221, -4.4), (-40.5699226221, -2))
            ThreePointArc((-40.5699226221, -2), (-41.2728663473, -0.3029437252), (-42.9699226221, 0.4))
            Line((-42.9699226221, 0.4), (-45.3699226221, 0.4))
            Line((-45.3699226221, 0.4), (-45.3699226221, 13))
            Line((-45.3699226221, 13), (-45.3699226221, 25.6))
        make_face(mode=Mode.SUBTRACT)
        with Locations((-17.9699226221, 28)):
            Circle(F13_R, mode=Mode.SUBTRACT)
    extrude(amount=F14_DEPTH)

    # F15 (on face) → F17 (cut, through all)
    with BuildSketch(Plane(origin=(0, 0, -29), x_dir=(1, 0, 0), z_dir=(0, 0, -1))):
        with Locations((65.5, -8.5)):
            Circle(F15_R)
        with Locations((65.5, -1)):
            Circle(F15_R)
        with Locations((65.5, 6.5)):
            Circle(F15_R)
    extrude(amount=-F17_DEPTH, mode=Mode.SUBTRACT)


with BuildPart() as f16:
    # F15 (on face) → F16 (new body)
    with BuildSketch(Plane(origin=(0, 0, -29), x_dir=(1, 0, 0), z_dir=(0, 0, -1))):
        with BuildLine():
            Line((67.5, -14), (67.5, 12))
            Line((67.5, 12), (37.5, 12))
            Line((37.5, 12), (37.5, 7.05))
            Line((37.5, 7.05), (40, 7.05))
            ThreePointArc((40, 7.05), (48.05, -1), (40, -9.05))
            Line((40, -9.05), (37.5, -9.05))
            Line((37.5, -9.05), (37.5, -14))
            Line((37.5, -14), (67.5, -14))
        make_face()
        with Locations((40, -11.5)):
            Circle(F15_R, mode=Mode.SUBTRACT)
        with Locations((61, -11.5)):
            Circle(F15_R, mode=Mode.SUBTRACT)
        with Locations((65.5, -8.5)):
            Circle(F15_R, mode=Mode.SUBTRACT)
        with Locations((40, 9.5)):
            Circle(F15_R, mode=Mode.SUBTRACT)
        with Locations((65.5, -1)):
            Circle(F15_R, mode=Mode.SUBTRACT)
        with Locations((65.5, 6.5)):
            Circle(F15_R, mode=Mode.SUBTRACT)
        with Locations((61, 9.5)):
            Circle(F15_R, mode=Mode.SUBTRACT)
    extrude(amount=F16_DEPTH)


solid = Compound([f9.part, f1_1.part, f7_1.part, f14.part, f16.part])
